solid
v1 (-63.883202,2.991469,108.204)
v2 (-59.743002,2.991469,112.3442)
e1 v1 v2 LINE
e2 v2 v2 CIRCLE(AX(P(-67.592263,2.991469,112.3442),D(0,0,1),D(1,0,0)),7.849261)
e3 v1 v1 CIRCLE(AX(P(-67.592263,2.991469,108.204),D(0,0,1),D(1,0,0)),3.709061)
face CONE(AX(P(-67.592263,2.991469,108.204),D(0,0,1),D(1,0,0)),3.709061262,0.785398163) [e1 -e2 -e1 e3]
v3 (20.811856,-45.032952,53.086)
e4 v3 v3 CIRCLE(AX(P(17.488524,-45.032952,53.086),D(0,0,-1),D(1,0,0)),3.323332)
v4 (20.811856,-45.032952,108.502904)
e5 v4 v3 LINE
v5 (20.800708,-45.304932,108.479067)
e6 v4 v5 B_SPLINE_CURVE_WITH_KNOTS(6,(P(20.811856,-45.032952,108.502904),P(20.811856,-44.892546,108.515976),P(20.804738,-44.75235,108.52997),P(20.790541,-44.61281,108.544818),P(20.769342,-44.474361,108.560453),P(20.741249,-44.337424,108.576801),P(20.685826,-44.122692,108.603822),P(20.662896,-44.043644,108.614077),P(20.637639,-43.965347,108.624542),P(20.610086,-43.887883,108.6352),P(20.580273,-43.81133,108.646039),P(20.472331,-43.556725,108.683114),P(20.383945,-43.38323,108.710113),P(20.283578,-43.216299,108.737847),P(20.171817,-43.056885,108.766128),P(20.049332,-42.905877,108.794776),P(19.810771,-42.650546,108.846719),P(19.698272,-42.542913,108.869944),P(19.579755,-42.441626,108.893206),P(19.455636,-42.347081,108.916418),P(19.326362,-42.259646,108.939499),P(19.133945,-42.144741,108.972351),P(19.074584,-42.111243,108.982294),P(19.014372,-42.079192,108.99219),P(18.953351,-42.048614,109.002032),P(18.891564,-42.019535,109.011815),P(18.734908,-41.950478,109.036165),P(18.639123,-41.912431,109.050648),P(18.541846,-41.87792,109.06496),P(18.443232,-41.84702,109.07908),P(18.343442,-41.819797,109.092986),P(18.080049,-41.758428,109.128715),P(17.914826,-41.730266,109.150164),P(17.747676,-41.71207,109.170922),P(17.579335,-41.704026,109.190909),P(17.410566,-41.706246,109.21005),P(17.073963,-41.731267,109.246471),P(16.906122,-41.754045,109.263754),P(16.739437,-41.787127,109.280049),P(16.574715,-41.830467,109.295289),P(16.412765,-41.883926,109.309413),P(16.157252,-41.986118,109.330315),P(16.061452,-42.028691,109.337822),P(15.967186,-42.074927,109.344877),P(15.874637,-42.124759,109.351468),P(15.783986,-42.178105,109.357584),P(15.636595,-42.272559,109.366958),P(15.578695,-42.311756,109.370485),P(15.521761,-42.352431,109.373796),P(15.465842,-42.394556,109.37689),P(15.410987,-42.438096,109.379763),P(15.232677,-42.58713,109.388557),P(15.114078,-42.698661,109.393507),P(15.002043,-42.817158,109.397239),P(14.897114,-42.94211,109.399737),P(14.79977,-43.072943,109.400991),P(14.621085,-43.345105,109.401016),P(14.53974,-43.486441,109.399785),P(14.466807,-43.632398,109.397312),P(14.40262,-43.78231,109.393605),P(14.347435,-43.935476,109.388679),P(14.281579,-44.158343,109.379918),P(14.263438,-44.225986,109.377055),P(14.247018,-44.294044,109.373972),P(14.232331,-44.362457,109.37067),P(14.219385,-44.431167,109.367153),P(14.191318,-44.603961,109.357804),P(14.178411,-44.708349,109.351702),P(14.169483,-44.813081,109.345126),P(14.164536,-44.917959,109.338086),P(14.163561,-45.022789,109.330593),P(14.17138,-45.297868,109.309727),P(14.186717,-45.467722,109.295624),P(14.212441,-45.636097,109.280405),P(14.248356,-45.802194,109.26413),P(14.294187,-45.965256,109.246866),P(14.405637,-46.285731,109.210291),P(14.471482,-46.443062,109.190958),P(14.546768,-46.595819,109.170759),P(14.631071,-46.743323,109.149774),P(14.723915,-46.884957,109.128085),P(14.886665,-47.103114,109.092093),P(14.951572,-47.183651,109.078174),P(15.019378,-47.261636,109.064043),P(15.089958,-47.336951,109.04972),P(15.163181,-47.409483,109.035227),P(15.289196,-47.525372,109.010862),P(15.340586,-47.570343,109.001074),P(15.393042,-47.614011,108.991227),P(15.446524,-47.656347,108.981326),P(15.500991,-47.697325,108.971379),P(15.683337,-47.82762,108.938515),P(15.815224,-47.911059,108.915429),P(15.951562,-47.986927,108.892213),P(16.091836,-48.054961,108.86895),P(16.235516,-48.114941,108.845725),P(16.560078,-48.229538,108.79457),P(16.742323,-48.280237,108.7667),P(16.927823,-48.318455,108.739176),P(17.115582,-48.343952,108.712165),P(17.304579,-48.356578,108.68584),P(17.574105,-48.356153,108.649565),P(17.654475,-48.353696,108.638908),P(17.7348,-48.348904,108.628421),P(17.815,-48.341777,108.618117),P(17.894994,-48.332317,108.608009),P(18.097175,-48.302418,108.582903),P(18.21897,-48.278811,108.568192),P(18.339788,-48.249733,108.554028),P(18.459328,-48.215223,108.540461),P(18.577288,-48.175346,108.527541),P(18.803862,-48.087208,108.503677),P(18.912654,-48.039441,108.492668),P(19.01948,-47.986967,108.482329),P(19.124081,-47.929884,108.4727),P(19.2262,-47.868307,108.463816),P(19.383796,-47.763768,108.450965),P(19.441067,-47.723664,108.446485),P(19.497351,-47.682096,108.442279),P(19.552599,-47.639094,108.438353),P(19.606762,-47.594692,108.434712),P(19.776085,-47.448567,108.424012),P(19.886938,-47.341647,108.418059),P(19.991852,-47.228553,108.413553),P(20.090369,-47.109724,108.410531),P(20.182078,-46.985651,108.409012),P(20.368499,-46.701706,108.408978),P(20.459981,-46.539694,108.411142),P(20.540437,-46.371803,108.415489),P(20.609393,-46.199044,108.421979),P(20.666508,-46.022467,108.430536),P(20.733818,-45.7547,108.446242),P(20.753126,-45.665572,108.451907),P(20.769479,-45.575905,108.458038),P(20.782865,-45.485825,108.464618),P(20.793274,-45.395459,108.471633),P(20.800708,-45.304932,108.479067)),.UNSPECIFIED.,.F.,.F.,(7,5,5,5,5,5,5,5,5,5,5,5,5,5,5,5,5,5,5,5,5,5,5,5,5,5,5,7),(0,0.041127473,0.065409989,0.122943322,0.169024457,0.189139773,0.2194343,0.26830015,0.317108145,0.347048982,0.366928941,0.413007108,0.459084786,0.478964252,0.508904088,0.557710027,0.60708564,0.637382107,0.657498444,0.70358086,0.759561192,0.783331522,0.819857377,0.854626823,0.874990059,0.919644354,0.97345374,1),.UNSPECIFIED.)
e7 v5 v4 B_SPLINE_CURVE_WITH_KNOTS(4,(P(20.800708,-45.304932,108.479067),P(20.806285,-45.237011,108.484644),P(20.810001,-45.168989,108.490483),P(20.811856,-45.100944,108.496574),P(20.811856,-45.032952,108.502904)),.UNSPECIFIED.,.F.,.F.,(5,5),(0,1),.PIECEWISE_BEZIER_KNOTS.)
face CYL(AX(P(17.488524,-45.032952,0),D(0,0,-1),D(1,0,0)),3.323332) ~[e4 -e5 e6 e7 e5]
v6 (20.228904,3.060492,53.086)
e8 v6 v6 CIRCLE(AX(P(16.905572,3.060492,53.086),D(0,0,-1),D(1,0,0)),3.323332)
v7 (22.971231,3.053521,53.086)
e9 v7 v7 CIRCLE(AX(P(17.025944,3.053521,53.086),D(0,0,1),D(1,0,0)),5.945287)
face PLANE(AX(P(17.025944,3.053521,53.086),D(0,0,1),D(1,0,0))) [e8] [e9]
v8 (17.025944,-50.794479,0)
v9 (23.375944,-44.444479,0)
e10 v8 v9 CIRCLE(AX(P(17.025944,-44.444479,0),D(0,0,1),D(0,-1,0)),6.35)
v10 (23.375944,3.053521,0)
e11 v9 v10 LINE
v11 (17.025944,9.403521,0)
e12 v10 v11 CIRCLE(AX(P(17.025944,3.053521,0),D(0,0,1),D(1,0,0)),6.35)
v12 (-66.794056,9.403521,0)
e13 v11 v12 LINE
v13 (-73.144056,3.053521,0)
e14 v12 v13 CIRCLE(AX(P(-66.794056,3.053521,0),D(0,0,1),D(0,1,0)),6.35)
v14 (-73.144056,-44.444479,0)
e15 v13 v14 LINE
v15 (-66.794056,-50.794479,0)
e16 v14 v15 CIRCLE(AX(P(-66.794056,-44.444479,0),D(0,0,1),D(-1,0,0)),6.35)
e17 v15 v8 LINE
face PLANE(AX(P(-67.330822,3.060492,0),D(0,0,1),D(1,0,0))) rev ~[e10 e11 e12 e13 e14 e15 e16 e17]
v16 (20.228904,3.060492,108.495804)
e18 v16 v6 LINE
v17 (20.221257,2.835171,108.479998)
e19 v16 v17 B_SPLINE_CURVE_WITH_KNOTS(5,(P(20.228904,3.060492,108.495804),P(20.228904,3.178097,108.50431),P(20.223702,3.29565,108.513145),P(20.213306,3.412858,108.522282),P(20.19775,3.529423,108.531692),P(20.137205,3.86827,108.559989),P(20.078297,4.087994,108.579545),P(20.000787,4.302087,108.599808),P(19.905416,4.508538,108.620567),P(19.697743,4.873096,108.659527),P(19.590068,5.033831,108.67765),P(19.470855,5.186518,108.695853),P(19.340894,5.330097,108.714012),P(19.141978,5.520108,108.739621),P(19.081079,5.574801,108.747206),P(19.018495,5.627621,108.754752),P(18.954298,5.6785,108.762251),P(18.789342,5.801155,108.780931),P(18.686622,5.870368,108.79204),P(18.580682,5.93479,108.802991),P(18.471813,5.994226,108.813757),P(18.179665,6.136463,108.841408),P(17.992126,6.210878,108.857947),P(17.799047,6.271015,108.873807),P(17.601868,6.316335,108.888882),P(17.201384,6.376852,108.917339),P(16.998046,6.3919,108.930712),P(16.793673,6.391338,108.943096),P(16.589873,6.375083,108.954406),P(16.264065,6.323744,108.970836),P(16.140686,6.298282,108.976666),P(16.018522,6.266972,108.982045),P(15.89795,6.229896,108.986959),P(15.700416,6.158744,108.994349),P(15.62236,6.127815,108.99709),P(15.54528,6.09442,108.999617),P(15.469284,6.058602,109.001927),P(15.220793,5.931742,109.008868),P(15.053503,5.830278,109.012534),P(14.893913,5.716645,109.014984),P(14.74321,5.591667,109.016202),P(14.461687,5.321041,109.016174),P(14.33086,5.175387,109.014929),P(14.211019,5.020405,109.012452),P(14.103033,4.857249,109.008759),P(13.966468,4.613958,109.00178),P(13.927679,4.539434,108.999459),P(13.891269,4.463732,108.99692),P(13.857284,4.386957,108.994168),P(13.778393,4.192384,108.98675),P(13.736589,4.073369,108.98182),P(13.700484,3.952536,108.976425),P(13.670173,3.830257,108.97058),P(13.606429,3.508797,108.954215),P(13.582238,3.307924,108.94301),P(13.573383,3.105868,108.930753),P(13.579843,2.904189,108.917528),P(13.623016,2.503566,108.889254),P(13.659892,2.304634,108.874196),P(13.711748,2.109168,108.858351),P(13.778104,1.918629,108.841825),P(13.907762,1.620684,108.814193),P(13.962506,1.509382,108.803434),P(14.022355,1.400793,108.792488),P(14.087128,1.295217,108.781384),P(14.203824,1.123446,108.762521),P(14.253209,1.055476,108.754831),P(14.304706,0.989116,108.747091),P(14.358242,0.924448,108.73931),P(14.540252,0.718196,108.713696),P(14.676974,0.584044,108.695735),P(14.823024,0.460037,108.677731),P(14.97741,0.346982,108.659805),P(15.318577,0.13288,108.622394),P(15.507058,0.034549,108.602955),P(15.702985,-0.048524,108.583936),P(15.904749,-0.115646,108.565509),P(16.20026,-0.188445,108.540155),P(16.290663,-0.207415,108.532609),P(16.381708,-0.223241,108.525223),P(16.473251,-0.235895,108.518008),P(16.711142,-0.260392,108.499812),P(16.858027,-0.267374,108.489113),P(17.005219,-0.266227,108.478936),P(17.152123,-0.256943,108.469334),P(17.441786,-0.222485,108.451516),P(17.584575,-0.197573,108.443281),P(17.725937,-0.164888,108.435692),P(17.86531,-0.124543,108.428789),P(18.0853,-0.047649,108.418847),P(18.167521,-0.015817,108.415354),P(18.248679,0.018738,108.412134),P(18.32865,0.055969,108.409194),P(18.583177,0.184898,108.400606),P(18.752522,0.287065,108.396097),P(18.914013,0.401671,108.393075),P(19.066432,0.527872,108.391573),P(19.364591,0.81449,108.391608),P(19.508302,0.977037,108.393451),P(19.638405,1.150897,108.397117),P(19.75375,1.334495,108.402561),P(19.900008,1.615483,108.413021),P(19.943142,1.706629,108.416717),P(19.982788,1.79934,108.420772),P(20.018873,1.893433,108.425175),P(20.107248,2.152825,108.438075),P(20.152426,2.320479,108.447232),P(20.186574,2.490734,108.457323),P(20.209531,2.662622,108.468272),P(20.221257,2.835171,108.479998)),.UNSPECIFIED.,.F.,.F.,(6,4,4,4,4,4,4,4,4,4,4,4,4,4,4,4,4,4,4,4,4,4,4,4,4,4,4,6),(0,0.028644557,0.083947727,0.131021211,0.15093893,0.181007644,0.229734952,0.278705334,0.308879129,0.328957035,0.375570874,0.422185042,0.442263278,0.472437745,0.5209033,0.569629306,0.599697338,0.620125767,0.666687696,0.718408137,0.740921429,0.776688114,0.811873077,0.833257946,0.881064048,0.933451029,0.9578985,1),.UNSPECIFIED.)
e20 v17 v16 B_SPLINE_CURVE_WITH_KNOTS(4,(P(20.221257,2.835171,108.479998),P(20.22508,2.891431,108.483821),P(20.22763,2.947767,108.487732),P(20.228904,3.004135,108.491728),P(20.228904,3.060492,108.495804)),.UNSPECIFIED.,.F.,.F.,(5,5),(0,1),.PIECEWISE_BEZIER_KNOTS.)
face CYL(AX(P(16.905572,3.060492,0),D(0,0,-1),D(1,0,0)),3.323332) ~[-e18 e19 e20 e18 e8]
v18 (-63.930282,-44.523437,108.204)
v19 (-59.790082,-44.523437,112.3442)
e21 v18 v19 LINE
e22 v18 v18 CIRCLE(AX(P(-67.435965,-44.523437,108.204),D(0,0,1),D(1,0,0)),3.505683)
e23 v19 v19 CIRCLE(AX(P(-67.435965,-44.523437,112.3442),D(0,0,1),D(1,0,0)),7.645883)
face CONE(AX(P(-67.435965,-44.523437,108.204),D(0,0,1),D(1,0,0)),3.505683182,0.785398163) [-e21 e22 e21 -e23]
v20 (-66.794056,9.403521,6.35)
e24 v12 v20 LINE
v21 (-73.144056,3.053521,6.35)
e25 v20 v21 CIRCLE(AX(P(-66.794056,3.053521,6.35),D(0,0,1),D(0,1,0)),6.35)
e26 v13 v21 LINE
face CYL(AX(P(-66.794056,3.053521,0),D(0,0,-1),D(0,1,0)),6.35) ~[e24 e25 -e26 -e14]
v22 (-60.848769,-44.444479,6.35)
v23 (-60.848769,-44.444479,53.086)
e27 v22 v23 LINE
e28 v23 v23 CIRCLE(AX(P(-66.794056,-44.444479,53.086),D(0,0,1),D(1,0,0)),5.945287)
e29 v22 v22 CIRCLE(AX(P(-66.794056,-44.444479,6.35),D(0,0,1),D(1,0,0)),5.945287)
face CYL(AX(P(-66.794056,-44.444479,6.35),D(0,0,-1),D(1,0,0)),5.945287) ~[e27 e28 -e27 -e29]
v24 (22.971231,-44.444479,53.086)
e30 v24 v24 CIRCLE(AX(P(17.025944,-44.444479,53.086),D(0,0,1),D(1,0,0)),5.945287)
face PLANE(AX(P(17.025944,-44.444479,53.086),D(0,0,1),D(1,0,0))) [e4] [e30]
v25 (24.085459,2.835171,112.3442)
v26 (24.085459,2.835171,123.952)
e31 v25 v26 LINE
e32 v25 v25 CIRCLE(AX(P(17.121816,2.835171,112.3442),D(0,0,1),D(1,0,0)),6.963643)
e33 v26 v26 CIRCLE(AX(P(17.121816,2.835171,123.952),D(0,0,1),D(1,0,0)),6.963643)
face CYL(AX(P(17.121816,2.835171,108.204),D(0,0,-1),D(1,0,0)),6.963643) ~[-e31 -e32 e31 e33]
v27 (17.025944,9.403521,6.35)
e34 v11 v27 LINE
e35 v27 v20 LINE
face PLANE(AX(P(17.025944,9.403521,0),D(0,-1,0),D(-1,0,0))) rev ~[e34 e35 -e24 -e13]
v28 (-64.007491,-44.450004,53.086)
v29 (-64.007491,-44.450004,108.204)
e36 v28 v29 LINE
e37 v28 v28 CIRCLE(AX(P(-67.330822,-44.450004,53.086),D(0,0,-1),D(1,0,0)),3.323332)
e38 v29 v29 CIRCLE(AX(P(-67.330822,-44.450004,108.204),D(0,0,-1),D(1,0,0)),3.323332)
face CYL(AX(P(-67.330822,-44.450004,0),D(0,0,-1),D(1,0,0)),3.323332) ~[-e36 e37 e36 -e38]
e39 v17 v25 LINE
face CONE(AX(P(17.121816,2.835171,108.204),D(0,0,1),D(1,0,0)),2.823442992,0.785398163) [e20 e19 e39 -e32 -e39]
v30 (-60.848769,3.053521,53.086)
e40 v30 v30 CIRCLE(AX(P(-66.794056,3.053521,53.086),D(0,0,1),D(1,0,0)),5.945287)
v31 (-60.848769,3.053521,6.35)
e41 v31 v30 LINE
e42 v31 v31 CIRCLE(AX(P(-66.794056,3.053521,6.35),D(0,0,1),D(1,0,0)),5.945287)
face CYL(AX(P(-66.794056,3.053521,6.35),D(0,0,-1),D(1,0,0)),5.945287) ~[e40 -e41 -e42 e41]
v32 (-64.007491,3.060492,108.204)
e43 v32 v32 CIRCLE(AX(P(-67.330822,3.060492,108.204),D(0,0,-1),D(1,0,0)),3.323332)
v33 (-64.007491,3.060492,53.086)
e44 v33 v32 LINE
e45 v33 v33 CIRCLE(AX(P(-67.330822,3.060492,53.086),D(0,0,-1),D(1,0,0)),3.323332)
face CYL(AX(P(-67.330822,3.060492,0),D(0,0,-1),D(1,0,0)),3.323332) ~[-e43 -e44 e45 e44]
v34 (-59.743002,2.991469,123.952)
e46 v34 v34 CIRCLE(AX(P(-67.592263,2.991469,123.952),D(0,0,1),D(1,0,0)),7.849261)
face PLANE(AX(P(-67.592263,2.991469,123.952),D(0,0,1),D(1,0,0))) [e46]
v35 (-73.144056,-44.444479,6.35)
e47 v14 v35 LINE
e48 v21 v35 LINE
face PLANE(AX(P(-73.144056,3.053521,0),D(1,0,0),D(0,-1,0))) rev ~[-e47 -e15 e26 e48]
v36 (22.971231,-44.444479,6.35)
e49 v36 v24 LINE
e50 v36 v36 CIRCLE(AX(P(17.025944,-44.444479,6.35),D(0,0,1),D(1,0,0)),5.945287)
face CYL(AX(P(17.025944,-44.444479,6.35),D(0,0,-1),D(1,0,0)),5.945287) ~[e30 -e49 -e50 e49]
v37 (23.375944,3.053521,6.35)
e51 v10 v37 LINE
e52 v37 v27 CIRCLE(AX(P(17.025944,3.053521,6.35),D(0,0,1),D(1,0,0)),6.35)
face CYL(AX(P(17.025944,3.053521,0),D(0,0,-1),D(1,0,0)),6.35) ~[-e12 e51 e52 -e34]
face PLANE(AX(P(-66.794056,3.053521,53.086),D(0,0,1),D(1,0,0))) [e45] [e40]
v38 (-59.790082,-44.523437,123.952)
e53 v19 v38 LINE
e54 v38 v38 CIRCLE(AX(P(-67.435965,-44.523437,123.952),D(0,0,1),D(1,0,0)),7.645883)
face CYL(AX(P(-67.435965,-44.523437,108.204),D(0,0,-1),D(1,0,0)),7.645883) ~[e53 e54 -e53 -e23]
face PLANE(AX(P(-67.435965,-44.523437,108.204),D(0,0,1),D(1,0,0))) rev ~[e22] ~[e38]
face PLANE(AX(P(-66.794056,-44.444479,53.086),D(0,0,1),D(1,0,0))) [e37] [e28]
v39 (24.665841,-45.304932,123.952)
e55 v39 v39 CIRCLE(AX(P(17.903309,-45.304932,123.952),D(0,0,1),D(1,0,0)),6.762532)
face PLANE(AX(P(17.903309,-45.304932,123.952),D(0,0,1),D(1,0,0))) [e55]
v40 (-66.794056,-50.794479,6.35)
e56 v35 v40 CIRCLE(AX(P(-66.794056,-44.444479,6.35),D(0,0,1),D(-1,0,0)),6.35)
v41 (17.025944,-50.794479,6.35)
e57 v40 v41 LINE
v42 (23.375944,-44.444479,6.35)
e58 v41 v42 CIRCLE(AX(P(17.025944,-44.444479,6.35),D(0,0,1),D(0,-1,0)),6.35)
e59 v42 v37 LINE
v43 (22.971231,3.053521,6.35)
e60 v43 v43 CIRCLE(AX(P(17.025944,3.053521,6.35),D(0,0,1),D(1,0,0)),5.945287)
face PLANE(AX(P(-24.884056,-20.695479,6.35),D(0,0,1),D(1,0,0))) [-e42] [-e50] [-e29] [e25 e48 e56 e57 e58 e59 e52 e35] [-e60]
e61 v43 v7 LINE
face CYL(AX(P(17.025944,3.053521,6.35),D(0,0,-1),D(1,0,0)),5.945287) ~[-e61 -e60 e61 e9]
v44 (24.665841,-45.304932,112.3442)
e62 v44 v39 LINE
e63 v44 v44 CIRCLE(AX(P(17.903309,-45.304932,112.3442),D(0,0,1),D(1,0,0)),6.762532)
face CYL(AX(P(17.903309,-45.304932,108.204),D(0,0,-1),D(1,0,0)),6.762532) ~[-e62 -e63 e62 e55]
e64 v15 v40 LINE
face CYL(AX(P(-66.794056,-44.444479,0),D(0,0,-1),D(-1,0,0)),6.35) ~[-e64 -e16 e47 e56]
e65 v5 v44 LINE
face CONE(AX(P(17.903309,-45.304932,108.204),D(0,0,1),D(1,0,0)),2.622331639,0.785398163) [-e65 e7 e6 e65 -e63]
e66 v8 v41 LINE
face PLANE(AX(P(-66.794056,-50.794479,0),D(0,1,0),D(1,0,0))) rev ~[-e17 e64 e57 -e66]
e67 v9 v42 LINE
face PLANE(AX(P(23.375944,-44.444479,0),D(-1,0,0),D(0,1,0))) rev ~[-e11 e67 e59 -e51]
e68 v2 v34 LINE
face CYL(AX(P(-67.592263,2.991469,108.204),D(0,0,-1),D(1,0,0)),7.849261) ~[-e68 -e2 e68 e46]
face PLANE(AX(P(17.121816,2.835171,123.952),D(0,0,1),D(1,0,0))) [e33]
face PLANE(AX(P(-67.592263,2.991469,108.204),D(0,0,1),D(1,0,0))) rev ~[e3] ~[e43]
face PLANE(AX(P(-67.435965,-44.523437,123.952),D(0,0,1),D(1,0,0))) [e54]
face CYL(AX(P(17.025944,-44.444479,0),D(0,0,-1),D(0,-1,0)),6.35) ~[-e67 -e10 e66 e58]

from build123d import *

# Parameters (mm, degrees)
F1_DEPTH     = 6.35
F2_R         = 5.9452870566
F3_DEPTH     = 46.736
F4_R         = 3.3233318127
F5_DEPTH     = 110.236
F7_START     = 108.204
F6_R         = 7.8492612618
F6_R_2       = 7.6458831821
F6_R_3       = 6.963642992
F6_R_4       = 6.7625316393
F7_DEPTH     = 15.748
F8_S9_R      = 3.3233318127
F8_T10_DEPTH = 11
F8_S15_R     = 3.3233318127
F8_T16_DEPTH = 12


# Not quite as in the source:
# - a fillet or chamfer that OpenCascade refuses, or shapes differently, is made with other operations: its cross-section is extruded or revolved along the edge and cut away or added


with BuildPart() as f1:
    # F0 (on Top) → F1 (new body)
    with BuildSketch(Plane.XY):
        with BuildLine():
            Line((17.025944097, 9.4035214942), (-66.794055903, 9.4035214942))
            ThreePointArc((-66.794055903, 9.4035214942), (-71.2841839635, 7.5436495547), (-73.144055903, 3.0535214942))
            Line((-73.144055903, 3.0535214942), (-73.144055903, -44.4444785058))
            ThreePointArc((-73.144055903, -44.4444785058), (-71.2841839635, -48.9346065664), (-66.794055903, -50.7944785058))
            Line((-66.794055903, -50.7944785058), (17.025944097, -50.7944785058))
            ThreePointArc((17.025944097, -50.7944785058), (21.5160721576, -48.9346065664), (23.375944097, -44.4444785058))
            Line((23.375944097, -44.4444785058), (23.375944097, 3.0535214942))
            ThreePointArc((23.375944097, 3.0535214942), (21.5160721576, 7.5436495547), (17.025944097, 9.4035214942))
        make_face()
    extrude(amount=F1_DEPTH)

    # F2 (on face) → F3 (join)
    with BuildSketch(Plane.XY.offset(6.35)):
        with Locations((-66.794055903, 3.0535214942)):
            Circle(F2_R)
        with Locations((17.025944097, 3.0535214942)):
            Circle(F2_R)
        with Locations((-66.794055903, -44.4444785058)):
            Circle(F2_R)
        with Locations((17.025944097, -44.4444785058)):
            Circle(F2_R)
    extrude(amount=F3_DEPTH)

    # F4 (on Top) → F5 (join)
    with BuildSketch(Plane.XY):
        with Locations((-67.3308223486, 3.0604917556)):
            Circle(F4_R)
        with Locations((16.9055722654, 3.0604917556)):
            Circle(F4_R)
        with Locations((-67.3308223486, -44.4500036538)):
            Circle(F4_R)
        with Locations((17.4885243177, -45.0329519808)):
            Circle(F4_R)
    extrude(amount=F5_DEPTH)

    # F6 (on Top) → F7 (join)
    with BuildSketch(Plane.XY.offset(F7_START)):
        with Locations((-67.5922632217, 2.9914693441)):
            Circle(F6_R)
        with Locations((-67.435964942, -44.5234365761)):
            Circle(F6_R_2)
        with Locations((17.121816054, 2.8351708315)):
            Circle(F6_R_3)
        with Locations((17.9033093154, -45.3049317002)):
            Circle(F6_R_4)
    extrude(amount=F7_DEPTH)

    # F8: chamfer of 4.1402 on 4 edges, made by hand

    # F8_s1 → F8_t2 (revolve, cut)
    with BuildSketch(Plane.XZ.offset(44.5234365761)):
        Polygon((-63.9302817599, 108.204), (-59.7900817599, 112.3442), (-59.7900817599, 108.204), align=None)
    revolve(axis=Axis((-67.435964942, -44.5234365761, 108.204), (0, 0, 1)), mode=Mode.SUBTRACT)

    # F8_s3 → F8_t4 (revolve, cut)
    with BuildSketch(Plane.XZ.offset(-2.9914693441)):
        Polygon((-63.8832019599, 108.204), (-59.7430019599, 112.3442), (-59.7430019599, 108.204), align=None)
    revolve(axis=Axis((-67.5922632217, 2.9914693441, 108.204), (0, 0, 1)), mode=Mode.SUBTRACT)


with BuildPart() as f8_tool6:
    # F8_s7 → F8_t8 (revolve)
    with BuildSketch(Plane.XZ.offset(45.3049317002)):
        Polygon((20.5256409548, 108.204), (24.6658409548, 112.3442), (24.6658409548, 108.204), align=None)
    revolve(axis=Axis((17.9033093154, -45.3049317002, 108.204), (0, 0, 1)))

    # F8_s9 → F8_t10 (cut, symmetric)
    with BuildSketch(Plane.XY.offset(110.3)):
        with Locations((17.4885243177, -45.0329519808)):
            Circle(F8_S9_R)
    extrude(amount=F8_T10_DEPTH, both=True, mode=Mode.SUBTRACT)


with BuildPart() as f1_1:
    add(f1.part)

    # F8_t5: cut F8_tool6
    add(f8_tool6.part, mode=Mode.SUBTRACT)


with BuildPart() as f8_tool12:
    # F8_s13 → F8_t14 (revolve)
    with BuildSketch(Plane.XZ.offset(-2.8351708315)):
        Polygon((19.945259046, 108.204), (24.085459046, 112.3442), (24.085459046, 108.204), align=None)
    revolve(axis=Axis((17.121816054, 2.8351708315, 108.204), (0, 0, 1)))

    # F8_s15 → F8_t16 (cut, symmetric)
    with BuildSketch(Plane.XY.offset(110.3)):
        with Locations((16.9055722654, 3.0604917556)):
            Circle(F8_S15_R)
    extrude(amount=F8_T16_DEPTH, both=True, mode=Mode.SUBTRACT)


with BuildPart() as f1_2:
    add(f1_1.part)

    # F8_t11: cut F8_tool12
    add(f8_tool12.part, mode=Mode.SUBTRACT)


solid = f1_2.part
